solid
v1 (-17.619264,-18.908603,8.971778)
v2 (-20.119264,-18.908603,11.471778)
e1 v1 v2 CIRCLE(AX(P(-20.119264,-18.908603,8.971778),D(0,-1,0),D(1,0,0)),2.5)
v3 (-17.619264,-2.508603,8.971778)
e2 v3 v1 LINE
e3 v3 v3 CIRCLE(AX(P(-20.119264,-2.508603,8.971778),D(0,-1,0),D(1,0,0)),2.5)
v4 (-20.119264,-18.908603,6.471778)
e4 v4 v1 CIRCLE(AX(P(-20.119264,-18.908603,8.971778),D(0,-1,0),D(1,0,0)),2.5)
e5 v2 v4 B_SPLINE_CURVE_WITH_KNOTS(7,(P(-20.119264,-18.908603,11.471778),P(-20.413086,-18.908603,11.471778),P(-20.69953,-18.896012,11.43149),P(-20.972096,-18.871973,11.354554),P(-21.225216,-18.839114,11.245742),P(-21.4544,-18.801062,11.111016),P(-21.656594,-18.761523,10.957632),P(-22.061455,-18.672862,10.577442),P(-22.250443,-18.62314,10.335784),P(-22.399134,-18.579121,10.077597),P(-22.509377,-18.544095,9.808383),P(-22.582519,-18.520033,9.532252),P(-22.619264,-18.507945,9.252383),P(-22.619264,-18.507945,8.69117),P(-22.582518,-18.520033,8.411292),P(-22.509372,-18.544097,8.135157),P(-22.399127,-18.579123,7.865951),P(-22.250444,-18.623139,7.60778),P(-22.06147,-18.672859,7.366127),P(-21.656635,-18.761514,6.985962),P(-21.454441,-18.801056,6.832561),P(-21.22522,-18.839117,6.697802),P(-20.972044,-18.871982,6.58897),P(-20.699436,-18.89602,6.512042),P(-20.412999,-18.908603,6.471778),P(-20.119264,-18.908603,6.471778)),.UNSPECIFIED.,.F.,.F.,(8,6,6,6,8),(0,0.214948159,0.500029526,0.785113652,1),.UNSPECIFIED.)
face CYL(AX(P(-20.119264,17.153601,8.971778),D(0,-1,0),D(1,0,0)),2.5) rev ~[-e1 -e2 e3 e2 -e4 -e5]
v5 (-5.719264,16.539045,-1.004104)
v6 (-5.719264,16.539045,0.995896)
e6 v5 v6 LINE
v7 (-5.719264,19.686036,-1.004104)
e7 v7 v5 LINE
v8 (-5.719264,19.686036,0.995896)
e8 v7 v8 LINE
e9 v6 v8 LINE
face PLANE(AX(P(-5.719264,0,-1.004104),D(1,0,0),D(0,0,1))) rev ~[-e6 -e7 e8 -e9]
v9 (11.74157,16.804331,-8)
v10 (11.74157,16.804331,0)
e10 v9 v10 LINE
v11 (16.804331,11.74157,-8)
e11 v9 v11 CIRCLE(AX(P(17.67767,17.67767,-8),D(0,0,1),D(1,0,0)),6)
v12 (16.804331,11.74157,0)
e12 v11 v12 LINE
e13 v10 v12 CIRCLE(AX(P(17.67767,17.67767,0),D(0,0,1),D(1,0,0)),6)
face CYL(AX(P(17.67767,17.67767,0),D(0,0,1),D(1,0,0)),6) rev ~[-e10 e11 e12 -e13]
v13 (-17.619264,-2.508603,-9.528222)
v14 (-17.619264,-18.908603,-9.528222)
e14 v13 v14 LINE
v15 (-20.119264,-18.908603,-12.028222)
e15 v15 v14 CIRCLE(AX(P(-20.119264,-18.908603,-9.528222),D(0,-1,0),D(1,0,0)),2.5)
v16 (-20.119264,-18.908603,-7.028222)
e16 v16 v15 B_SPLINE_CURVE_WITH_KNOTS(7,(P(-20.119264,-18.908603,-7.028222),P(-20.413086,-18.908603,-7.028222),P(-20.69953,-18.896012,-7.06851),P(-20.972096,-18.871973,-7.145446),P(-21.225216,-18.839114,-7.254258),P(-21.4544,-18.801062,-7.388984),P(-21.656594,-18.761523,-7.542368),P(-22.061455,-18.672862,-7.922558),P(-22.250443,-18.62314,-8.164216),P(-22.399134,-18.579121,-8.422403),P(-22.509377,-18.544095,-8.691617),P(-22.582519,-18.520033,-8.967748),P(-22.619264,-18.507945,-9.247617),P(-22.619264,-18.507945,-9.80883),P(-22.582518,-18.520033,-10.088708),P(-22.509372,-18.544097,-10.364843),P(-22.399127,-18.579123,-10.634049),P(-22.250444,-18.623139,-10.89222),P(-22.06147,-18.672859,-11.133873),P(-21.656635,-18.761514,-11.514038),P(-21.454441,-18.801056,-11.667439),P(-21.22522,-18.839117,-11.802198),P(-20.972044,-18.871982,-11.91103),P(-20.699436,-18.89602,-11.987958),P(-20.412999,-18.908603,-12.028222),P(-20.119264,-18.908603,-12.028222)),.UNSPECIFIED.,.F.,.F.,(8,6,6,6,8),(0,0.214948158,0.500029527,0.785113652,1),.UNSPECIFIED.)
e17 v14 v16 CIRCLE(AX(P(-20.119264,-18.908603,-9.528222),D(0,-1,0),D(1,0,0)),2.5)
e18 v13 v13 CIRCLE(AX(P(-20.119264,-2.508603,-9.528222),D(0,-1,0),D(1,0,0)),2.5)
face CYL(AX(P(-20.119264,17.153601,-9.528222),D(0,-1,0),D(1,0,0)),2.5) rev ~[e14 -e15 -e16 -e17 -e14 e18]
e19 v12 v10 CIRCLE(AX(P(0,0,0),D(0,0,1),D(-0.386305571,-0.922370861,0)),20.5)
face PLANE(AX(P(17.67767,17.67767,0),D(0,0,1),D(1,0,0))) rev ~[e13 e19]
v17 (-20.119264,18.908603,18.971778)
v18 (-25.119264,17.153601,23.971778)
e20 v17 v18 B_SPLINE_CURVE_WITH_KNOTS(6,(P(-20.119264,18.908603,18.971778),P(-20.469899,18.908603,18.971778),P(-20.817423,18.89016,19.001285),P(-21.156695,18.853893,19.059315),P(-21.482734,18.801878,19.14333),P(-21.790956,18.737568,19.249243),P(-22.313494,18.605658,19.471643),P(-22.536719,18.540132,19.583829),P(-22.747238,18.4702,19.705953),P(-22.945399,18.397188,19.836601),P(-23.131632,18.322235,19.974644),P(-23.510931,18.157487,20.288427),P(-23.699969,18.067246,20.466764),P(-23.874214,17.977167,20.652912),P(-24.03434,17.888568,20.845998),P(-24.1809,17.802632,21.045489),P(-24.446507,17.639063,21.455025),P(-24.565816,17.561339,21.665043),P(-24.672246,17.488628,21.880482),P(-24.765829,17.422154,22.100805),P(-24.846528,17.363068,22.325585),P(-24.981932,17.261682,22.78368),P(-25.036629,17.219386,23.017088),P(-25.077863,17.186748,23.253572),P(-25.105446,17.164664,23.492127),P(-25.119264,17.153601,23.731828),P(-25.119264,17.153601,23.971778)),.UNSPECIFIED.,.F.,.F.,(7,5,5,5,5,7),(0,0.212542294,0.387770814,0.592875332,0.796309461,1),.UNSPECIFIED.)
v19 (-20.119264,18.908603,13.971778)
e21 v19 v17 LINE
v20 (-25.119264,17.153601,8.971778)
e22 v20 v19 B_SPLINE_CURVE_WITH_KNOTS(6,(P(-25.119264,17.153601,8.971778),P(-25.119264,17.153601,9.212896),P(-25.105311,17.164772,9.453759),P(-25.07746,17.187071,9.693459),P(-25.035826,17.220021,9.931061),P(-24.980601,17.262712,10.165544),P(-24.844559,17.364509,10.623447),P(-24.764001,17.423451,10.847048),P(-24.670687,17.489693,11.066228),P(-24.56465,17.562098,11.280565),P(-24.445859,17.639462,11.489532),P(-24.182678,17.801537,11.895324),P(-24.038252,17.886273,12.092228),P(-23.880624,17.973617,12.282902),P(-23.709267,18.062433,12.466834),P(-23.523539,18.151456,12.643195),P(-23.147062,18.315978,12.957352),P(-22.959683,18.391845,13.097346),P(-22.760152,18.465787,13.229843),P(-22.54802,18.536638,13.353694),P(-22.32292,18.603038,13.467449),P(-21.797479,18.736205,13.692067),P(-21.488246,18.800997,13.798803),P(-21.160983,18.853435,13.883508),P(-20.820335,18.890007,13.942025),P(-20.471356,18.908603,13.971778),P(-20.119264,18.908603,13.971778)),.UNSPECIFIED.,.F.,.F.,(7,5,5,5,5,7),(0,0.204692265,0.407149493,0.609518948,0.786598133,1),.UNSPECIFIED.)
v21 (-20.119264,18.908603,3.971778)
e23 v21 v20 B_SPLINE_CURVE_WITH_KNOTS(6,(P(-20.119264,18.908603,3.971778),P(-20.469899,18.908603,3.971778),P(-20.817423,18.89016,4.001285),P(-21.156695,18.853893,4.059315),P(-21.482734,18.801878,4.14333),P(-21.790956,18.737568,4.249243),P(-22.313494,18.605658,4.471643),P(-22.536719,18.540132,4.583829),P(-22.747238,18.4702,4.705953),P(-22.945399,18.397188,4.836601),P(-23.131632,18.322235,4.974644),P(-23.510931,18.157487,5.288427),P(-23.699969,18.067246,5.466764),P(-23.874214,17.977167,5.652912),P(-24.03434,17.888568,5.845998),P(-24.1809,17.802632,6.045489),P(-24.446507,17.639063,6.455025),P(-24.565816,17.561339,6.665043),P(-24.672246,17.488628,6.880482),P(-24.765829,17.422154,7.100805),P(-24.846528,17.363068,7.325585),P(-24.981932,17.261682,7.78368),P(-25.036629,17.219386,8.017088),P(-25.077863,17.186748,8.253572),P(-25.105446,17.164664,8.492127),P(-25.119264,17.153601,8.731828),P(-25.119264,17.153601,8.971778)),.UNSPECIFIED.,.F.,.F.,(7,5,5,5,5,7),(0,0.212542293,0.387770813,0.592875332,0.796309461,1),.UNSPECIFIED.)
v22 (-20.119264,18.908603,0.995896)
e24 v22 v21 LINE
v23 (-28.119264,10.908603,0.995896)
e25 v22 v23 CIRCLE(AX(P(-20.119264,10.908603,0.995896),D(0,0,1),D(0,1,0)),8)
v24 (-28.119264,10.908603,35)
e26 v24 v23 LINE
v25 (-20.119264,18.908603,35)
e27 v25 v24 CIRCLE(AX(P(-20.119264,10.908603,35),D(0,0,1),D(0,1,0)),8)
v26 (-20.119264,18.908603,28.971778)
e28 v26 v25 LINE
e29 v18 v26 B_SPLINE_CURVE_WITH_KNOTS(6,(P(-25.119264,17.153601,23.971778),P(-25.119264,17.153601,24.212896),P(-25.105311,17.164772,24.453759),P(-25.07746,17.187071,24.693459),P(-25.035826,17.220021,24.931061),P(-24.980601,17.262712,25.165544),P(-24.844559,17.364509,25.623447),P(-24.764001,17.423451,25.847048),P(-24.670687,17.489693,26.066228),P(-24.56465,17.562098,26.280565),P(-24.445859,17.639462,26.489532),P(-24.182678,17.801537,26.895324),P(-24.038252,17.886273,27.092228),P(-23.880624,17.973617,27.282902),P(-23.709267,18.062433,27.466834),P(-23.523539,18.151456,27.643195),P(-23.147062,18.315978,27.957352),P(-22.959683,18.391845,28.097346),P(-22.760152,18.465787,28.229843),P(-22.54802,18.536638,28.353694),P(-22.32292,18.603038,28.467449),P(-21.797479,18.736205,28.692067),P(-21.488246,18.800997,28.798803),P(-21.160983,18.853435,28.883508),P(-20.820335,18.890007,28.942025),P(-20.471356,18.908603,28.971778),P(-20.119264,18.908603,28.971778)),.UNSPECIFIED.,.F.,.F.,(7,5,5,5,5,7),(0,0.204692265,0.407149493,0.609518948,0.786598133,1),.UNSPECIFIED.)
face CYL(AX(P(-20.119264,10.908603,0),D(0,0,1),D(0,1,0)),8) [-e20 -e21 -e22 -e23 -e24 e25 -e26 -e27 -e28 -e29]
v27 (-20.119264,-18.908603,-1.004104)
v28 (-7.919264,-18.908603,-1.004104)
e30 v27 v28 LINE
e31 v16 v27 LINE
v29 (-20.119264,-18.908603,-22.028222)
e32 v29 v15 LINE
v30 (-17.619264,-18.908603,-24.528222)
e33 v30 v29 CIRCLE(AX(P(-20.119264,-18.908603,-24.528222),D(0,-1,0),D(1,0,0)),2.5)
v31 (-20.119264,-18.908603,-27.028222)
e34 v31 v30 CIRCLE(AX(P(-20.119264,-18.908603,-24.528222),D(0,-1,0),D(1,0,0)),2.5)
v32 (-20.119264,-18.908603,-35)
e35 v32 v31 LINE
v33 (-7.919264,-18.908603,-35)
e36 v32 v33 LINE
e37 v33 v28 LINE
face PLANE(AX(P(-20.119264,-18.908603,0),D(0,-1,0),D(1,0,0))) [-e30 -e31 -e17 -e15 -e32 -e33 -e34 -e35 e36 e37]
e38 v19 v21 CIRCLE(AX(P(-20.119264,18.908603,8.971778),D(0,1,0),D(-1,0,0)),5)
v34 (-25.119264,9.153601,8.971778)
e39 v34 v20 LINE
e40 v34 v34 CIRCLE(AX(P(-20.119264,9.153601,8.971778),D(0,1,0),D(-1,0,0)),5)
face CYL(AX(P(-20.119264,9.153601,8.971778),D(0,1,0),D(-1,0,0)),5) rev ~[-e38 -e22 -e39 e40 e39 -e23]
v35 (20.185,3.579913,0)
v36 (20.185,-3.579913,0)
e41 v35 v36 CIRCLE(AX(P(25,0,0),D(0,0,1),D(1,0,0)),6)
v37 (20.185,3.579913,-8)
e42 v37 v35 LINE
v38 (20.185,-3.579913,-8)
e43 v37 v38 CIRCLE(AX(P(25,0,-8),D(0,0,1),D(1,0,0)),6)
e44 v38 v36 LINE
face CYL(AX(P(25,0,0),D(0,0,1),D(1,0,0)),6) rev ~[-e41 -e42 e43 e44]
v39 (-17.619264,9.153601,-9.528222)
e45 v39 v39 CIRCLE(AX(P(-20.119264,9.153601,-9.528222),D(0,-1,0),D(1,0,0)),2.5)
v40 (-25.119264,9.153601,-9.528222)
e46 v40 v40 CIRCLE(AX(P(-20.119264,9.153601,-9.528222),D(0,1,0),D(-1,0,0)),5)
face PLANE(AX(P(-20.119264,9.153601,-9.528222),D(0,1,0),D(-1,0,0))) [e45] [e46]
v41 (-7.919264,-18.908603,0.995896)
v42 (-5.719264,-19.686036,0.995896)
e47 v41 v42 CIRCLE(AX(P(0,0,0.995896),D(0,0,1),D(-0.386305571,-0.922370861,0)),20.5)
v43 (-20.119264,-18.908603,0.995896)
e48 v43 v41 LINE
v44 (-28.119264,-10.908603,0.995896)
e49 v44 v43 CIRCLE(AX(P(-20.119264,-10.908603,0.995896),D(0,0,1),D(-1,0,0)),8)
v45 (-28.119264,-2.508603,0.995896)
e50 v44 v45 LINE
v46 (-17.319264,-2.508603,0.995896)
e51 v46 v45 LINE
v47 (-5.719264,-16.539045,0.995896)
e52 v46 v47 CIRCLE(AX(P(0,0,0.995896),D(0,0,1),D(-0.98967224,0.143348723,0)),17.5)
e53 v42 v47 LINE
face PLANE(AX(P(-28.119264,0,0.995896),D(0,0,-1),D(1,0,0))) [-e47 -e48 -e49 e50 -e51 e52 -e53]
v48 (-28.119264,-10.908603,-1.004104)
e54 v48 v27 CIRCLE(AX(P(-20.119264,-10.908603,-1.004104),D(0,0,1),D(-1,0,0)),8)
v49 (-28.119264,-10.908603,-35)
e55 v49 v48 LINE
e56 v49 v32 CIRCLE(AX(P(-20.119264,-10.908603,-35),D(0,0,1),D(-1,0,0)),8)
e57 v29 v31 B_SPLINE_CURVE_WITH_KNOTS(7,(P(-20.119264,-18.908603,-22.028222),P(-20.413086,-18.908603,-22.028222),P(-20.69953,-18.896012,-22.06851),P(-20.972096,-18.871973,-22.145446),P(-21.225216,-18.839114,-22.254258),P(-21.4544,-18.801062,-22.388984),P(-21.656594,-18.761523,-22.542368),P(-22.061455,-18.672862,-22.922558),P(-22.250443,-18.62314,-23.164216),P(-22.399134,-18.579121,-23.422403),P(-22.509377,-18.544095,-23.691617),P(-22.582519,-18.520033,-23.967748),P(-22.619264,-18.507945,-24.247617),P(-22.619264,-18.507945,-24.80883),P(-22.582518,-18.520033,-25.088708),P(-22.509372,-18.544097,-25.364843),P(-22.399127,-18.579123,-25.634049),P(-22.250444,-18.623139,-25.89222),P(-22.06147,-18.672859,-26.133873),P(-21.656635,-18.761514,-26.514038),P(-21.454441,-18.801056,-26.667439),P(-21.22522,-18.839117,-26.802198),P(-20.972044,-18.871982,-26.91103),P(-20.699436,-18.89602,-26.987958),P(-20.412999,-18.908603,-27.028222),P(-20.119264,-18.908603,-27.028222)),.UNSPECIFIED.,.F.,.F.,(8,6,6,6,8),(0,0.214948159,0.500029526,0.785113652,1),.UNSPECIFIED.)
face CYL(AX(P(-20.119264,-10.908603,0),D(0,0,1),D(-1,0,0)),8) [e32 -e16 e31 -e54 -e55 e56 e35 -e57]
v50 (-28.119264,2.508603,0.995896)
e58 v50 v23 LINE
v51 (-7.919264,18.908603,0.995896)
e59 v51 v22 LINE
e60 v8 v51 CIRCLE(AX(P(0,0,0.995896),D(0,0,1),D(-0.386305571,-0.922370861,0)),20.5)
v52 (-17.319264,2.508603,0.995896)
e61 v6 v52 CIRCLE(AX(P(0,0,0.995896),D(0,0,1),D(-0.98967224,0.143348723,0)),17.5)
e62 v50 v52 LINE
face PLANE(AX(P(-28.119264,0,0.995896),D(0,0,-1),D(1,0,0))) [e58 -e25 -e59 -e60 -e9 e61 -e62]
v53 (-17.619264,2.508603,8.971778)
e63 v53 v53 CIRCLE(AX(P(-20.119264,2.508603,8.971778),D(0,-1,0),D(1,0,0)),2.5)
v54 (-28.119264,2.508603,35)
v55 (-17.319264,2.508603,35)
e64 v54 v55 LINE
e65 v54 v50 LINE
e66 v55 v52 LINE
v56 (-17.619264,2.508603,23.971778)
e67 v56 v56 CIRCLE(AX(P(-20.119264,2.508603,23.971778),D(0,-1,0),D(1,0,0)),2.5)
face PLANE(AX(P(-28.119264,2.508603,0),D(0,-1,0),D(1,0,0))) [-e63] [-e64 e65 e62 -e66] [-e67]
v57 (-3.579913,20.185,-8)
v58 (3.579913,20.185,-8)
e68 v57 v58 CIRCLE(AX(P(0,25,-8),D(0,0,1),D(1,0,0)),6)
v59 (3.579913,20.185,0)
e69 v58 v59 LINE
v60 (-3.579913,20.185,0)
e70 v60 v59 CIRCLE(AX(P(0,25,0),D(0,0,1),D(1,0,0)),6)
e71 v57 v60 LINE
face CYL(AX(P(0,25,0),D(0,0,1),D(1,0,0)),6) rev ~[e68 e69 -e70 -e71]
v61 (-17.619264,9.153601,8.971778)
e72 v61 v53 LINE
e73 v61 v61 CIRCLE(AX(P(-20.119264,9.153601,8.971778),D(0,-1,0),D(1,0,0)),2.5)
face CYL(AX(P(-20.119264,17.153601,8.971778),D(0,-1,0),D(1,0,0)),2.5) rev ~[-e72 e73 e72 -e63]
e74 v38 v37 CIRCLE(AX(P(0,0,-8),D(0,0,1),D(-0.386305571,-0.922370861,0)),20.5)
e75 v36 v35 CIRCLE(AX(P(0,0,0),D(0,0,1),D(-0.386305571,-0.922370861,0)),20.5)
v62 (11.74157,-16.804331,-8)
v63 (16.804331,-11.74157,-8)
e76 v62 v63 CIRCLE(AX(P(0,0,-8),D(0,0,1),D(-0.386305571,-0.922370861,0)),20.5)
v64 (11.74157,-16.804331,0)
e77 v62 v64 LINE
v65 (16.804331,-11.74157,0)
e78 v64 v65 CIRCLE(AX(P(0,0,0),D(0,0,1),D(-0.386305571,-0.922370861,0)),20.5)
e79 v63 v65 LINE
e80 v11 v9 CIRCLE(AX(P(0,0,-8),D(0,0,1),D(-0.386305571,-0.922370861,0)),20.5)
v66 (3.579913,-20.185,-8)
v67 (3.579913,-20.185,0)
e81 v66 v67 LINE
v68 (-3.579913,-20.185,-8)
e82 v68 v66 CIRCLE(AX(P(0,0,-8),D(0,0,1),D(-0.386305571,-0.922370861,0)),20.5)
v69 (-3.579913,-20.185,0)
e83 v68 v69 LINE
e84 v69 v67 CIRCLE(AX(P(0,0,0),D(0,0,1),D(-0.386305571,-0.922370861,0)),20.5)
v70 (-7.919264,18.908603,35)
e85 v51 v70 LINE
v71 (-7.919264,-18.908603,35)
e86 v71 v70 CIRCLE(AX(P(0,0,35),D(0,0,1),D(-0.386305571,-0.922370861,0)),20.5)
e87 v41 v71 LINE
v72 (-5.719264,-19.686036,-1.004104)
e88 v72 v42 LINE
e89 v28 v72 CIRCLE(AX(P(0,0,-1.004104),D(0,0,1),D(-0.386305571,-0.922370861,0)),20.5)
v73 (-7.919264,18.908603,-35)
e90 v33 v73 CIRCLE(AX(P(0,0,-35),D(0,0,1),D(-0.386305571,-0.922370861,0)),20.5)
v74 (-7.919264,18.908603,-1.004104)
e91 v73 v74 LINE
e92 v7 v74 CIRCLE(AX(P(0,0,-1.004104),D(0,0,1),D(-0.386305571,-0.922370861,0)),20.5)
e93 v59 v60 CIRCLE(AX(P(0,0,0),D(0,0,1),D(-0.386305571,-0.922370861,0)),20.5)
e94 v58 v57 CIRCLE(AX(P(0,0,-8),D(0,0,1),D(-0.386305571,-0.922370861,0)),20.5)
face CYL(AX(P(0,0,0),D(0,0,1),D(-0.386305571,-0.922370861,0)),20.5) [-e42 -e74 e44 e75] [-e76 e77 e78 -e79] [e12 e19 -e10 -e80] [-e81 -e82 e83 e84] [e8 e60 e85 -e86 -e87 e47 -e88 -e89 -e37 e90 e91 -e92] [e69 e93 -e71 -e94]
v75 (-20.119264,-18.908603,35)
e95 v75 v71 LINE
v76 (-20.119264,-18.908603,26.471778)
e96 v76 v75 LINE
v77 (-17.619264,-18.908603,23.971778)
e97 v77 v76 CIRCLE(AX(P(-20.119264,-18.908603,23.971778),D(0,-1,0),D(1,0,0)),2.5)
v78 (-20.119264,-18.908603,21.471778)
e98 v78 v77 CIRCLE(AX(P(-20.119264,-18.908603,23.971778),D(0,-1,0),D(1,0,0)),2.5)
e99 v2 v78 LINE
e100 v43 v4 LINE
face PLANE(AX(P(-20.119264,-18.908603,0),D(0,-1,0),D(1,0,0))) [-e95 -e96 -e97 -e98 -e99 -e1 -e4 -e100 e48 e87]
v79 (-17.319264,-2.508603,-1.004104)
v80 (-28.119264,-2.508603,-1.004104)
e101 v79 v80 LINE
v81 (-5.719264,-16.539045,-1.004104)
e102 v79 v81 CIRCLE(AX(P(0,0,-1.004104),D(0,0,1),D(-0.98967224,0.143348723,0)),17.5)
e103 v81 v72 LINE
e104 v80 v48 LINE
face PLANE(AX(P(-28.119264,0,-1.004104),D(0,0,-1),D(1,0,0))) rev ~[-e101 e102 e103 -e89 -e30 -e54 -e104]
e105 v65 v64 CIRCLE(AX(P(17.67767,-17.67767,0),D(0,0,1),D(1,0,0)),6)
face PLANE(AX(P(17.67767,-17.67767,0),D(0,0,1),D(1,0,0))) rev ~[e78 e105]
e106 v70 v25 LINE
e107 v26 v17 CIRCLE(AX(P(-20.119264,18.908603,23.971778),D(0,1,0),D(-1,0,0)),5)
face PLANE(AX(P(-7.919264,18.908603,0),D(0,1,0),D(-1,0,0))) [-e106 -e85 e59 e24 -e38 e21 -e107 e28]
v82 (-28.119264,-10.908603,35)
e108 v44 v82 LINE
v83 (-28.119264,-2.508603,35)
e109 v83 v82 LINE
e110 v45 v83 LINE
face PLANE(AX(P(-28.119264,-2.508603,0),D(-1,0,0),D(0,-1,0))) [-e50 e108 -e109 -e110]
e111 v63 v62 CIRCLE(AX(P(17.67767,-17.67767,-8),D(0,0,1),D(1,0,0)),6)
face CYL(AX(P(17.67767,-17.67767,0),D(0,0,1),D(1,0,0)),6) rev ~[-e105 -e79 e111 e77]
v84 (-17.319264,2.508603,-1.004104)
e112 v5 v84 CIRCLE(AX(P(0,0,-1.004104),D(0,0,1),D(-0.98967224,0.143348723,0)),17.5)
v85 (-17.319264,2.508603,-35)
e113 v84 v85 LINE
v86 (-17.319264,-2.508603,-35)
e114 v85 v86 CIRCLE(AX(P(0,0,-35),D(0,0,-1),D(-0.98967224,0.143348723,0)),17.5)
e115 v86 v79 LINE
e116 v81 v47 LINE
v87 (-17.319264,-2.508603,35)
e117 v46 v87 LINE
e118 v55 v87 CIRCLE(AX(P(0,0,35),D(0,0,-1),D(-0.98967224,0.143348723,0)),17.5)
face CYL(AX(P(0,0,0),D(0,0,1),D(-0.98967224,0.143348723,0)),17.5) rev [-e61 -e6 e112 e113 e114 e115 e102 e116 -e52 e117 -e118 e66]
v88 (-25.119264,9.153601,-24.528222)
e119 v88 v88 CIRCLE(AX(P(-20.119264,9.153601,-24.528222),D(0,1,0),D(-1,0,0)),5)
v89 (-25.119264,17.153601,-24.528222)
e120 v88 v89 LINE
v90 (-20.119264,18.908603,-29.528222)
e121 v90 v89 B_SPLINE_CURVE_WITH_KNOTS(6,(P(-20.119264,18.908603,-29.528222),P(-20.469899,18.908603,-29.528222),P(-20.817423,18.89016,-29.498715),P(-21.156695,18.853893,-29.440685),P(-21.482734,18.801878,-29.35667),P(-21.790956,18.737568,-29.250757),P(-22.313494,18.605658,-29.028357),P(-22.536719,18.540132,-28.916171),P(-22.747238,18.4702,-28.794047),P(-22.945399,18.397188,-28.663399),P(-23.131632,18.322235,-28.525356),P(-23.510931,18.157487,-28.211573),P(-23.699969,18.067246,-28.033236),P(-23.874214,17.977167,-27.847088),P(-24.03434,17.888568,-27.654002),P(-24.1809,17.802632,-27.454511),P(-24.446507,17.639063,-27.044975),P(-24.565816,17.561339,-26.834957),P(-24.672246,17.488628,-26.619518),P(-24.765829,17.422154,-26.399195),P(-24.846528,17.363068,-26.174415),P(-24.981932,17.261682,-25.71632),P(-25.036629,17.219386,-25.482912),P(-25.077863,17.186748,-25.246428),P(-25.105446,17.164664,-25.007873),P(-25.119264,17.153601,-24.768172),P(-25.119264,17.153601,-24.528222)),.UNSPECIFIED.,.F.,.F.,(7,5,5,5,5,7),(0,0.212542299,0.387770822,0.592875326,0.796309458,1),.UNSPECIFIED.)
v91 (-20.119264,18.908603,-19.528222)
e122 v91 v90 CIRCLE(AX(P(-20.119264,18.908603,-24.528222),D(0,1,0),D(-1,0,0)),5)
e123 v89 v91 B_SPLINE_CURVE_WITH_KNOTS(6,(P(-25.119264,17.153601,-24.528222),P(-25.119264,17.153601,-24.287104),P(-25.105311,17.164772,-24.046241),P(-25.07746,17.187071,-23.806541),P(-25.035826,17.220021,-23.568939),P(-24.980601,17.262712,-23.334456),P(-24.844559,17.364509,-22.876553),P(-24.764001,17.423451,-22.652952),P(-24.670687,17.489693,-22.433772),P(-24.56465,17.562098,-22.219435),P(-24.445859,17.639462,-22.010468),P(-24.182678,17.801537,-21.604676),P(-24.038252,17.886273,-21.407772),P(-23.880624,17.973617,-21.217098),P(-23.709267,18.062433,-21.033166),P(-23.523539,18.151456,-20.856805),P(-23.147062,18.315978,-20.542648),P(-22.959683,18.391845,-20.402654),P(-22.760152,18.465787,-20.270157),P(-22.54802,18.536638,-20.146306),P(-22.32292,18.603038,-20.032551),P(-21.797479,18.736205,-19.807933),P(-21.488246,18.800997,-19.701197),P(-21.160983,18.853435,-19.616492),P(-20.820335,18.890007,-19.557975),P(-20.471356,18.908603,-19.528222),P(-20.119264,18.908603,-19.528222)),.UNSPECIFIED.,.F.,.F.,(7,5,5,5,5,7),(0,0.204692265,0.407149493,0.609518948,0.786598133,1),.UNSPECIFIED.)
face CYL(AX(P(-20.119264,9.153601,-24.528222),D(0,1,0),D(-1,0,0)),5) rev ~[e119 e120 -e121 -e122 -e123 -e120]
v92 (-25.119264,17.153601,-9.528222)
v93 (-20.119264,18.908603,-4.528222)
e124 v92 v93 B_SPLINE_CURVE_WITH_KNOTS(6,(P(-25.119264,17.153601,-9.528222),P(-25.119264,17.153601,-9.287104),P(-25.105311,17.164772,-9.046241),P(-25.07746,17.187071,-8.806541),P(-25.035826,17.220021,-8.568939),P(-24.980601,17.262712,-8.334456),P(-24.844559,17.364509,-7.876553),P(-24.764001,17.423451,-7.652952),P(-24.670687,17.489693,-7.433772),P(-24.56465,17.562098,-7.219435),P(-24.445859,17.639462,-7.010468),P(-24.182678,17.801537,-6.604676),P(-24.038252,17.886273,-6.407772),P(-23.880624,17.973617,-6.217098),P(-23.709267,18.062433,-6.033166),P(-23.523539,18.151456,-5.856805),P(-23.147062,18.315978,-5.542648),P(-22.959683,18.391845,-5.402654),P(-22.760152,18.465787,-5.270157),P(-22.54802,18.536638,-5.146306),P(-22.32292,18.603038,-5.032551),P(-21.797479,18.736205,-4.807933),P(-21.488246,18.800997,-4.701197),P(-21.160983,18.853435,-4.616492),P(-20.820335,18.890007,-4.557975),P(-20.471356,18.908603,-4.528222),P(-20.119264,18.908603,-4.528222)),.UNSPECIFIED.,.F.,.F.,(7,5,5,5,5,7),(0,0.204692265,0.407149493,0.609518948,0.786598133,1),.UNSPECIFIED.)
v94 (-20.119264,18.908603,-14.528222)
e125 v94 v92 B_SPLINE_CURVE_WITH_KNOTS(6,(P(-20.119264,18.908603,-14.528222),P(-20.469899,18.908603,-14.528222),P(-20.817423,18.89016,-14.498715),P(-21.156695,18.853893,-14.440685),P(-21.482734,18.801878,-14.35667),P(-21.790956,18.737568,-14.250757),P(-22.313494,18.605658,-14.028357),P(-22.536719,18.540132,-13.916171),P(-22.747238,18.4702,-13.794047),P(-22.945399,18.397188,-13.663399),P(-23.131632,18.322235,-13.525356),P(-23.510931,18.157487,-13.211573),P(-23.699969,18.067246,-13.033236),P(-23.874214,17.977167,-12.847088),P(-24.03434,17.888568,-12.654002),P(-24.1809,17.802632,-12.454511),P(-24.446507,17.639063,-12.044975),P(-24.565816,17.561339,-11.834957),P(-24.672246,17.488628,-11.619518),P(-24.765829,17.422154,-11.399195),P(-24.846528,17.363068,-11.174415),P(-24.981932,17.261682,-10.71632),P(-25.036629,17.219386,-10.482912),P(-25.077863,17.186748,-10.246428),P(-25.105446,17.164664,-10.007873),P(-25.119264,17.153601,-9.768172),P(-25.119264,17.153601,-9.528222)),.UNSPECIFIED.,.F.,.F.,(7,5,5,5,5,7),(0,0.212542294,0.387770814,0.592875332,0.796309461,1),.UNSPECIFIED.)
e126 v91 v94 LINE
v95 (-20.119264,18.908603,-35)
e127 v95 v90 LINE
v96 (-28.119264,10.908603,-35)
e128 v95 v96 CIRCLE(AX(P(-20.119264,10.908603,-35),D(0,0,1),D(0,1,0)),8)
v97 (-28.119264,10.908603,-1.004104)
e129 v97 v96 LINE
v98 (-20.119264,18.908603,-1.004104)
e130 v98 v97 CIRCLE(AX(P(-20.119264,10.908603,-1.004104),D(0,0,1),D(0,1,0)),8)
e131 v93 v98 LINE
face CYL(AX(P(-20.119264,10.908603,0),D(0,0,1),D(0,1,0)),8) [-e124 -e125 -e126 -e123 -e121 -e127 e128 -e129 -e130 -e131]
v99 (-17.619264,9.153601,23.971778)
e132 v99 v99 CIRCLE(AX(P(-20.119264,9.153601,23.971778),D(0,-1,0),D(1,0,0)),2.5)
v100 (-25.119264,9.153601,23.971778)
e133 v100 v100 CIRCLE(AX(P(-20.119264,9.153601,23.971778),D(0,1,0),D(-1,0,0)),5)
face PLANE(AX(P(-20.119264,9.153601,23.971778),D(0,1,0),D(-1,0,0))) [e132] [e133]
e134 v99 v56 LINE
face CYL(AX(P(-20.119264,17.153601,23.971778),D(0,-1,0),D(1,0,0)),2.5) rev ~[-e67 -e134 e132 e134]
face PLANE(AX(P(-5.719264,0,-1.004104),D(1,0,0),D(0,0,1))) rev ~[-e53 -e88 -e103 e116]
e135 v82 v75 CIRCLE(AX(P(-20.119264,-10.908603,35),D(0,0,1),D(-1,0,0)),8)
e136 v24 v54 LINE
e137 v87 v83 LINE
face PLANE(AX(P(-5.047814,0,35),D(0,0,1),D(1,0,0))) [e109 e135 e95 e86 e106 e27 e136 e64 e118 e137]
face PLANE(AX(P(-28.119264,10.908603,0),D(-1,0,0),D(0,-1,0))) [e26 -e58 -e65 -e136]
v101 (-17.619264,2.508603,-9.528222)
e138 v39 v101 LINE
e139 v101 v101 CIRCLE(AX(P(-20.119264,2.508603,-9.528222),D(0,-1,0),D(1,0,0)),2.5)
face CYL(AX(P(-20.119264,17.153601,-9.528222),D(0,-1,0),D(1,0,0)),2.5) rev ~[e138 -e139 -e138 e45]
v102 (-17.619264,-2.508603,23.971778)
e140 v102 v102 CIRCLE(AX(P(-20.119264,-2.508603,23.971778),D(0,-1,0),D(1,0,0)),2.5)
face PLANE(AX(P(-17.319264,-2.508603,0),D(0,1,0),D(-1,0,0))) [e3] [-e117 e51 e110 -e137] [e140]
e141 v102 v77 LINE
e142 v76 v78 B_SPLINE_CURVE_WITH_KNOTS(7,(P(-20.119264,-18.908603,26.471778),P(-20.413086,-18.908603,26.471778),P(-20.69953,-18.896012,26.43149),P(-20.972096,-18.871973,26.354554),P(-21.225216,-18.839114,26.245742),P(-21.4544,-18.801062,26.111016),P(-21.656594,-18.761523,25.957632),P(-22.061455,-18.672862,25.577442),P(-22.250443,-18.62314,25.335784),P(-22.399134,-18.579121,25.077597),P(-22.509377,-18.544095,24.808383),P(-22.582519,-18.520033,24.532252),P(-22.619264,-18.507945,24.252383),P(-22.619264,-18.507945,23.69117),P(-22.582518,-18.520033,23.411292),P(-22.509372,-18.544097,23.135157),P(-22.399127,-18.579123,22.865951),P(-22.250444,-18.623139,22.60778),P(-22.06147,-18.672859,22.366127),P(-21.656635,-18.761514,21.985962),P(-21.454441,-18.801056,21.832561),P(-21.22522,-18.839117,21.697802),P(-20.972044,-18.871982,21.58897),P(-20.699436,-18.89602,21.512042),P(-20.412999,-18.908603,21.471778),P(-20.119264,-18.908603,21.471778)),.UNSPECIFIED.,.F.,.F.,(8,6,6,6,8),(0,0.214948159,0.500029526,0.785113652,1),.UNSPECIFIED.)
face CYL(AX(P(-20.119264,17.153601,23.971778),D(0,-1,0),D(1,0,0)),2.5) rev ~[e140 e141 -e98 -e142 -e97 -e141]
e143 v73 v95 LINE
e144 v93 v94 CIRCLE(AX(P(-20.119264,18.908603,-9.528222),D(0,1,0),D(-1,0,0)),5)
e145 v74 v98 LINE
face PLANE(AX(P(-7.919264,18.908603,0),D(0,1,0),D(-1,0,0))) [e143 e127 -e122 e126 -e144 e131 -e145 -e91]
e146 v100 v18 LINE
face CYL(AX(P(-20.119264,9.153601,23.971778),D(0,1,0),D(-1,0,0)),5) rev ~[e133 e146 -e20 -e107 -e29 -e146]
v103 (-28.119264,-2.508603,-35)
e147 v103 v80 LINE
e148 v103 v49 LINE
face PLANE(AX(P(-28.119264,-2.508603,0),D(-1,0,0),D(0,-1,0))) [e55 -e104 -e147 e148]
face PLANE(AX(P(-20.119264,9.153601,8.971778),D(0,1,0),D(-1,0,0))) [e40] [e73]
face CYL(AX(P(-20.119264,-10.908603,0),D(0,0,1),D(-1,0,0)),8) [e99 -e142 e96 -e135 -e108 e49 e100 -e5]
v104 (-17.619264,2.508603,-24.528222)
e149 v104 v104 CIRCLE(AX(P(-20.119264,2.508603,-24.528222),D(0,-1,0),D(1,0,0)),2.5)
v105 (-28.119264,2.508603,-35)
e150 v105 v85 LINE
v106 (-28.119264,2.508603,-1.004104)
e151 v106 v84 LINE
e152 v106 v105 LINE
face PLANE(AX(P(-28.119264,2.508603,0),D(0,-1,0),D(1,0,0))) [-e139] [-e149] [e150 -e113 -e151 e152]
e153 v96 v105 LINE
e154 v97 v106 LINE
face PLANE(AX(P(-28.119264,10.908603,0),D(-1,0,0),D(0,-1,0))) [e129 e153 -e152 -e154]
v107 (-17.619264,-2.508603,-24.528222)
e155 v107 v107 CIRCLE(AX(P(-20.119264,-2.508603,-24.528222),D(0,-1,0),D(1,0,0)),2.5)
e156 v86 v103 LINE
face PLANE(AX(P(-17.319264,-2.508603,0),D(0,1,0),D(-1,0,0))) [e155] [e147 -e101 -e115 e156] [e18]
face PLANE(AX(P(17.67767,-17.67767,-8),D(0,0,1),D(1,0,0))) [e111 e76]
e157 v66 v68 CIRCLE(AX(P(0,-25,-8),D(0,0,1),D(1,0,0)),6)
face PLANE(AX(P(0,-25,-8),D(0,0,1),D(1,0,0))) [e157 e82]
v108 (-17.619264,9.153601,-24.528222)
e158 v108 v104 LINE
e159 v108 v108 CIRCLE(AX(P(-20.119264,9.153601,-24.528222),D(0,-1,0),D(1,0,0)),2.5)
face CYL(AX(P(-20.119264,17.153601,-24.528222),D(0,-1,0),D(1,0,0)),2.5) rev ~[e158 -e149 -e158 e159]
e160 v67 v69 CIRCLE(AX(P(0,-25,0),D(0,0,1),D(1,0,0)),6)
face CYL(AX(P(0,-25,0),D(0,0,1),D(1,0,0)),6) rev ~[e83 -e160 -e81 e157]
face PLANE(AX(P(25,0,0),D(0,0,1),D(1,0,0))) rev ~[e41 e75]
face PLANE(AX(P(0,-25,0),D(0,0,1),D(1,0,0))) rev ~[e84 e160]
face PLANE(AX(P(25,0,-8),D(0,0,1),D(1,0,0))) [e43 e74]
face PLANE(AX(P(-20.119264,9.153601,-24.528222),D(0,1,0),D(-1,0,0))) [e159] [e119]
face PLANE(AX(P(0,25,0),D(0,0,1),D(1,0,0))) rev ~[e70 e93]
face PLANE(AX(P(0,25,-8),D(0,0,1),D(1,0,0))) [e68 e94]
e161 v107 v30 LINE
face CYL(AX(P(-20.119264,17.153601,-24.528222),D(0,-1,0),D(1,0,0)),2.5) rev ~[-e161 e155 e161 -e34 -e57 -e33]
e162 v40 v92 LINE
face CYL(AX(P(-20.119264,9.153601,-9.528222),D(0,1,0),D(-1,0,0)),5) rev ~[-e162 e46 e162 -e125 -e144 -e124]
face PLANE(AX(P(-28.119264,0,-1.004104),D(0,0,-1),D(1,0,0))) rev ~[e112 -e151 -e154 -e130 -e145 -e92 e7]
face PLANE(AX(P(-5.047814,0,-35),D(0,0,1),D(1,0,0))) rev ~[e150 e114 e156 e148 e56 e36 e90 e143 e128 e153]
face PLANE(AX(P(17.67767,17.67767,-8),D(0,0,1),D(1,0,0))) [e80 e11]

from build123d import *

# Parameters (mm, degrees)
F1_DEPTH       = 35
F3_D           = 5
F3_START       = 1.7550021
F3_CBORE_D     = 10
F3_CBORE_DEPTH = 8
F4_W           = 22.4
F4_H           = 2
F5_DEPTH       = 25
F6_R           = 6
F7_DEPTH       = 8


with BuildPart() as f1:
    # F0 (on Top) → F1 (new body, symmetric)
    with BuildSketch(Plane.XY):
        with BuildLine():
            ThreePointArc((-17.3192642082, 2.5086026559), (17.5, 0), (-17.3192642082, -2.5086026559))
            Line((-17.3192642082, -2.5086026559), (-28.1192642082, -2.5086026559))
            Line((-28.1192642082, -2.5086026559), (-28.1192642082, -10.9086026559))
            ThreePointArc((-28.1192642082, -10.9086026559), (-25.7761184577, -16.5654569054), (-20.1192642082, -18.9086026559))
            Line((-20.1192642082, -18.9086026559), (-7.9192642082, -18.9086026559))
            ThreePointArc((-7.9192642082, -18.9086026559), (20.5, 0), (-7.9192642082, 18.9086026559))
            Line((-7.9192642082, 18.9086026559), (-20.1192642082, 18.9086026559))
            ThreePointArc((-20.1192642082, 18.9086026559), (-25.7761184577, 16.5654569054), (-28.1192642082, 10.9086026559))
            Line((-28.1192642082, 10.9086026559), (-28.1192642082, 2.5086026559))
            Line((-28.1192642082, 2.5086026559), (-17.3192642082, 2.5086026559))
        make_face()
    extrude(amount=F1_DEPTH, both=True)

    # F3 (through all)
    # its depths count from where the whole tool has entered the part; down to there all is cleared
    with Locations(Plane(origin=(0, 18.9086026559, 0), x_dir=(-1, 0, 0), z_dir=(0, 1, 0)).offset(-F3_START)):
        with Locations((20.1192642082, 23.9717778414), (20.1192642082, 8.9717778414), (20.1192642082, -9.5282221586), (20.1192642082, -24.5282221586)):
            CounterBoreHole(F3_D / 2, F3_CBORE_D / 2, F3_CBORE_DEPTH)

    # F4 (on Front) → F5 (cut, symmetric)
    with BuildSketch(Plane.XZ):
        with Locations((-16.9192642082, -0.0041035237)):
            Rectangle(F4_W, F4_H)
    extrude(amount=F5_DEPTH, both=True, mode=Mode.SUBTRACT)

    # F6 (on Top) → F7 (cut)
    with BuildSketch(Plane.XY):
        with Locations((0, -25)):
            Circle(F6_R)
        with Locations((17.6776695297, -17.6776695297)):
            Circle(F6_R)
        with Locations((25, 0)):
            Circle(F6_R)
        with Locations((17.6776695297, 17.6776695297)):
            Circle(F6_R)
        with Locations((0, 25)):
            Circle(F6_R)
    extrude(amount=-F7_DEPTH, mode=Mode.SUBTRACT)


solid = f1.part
